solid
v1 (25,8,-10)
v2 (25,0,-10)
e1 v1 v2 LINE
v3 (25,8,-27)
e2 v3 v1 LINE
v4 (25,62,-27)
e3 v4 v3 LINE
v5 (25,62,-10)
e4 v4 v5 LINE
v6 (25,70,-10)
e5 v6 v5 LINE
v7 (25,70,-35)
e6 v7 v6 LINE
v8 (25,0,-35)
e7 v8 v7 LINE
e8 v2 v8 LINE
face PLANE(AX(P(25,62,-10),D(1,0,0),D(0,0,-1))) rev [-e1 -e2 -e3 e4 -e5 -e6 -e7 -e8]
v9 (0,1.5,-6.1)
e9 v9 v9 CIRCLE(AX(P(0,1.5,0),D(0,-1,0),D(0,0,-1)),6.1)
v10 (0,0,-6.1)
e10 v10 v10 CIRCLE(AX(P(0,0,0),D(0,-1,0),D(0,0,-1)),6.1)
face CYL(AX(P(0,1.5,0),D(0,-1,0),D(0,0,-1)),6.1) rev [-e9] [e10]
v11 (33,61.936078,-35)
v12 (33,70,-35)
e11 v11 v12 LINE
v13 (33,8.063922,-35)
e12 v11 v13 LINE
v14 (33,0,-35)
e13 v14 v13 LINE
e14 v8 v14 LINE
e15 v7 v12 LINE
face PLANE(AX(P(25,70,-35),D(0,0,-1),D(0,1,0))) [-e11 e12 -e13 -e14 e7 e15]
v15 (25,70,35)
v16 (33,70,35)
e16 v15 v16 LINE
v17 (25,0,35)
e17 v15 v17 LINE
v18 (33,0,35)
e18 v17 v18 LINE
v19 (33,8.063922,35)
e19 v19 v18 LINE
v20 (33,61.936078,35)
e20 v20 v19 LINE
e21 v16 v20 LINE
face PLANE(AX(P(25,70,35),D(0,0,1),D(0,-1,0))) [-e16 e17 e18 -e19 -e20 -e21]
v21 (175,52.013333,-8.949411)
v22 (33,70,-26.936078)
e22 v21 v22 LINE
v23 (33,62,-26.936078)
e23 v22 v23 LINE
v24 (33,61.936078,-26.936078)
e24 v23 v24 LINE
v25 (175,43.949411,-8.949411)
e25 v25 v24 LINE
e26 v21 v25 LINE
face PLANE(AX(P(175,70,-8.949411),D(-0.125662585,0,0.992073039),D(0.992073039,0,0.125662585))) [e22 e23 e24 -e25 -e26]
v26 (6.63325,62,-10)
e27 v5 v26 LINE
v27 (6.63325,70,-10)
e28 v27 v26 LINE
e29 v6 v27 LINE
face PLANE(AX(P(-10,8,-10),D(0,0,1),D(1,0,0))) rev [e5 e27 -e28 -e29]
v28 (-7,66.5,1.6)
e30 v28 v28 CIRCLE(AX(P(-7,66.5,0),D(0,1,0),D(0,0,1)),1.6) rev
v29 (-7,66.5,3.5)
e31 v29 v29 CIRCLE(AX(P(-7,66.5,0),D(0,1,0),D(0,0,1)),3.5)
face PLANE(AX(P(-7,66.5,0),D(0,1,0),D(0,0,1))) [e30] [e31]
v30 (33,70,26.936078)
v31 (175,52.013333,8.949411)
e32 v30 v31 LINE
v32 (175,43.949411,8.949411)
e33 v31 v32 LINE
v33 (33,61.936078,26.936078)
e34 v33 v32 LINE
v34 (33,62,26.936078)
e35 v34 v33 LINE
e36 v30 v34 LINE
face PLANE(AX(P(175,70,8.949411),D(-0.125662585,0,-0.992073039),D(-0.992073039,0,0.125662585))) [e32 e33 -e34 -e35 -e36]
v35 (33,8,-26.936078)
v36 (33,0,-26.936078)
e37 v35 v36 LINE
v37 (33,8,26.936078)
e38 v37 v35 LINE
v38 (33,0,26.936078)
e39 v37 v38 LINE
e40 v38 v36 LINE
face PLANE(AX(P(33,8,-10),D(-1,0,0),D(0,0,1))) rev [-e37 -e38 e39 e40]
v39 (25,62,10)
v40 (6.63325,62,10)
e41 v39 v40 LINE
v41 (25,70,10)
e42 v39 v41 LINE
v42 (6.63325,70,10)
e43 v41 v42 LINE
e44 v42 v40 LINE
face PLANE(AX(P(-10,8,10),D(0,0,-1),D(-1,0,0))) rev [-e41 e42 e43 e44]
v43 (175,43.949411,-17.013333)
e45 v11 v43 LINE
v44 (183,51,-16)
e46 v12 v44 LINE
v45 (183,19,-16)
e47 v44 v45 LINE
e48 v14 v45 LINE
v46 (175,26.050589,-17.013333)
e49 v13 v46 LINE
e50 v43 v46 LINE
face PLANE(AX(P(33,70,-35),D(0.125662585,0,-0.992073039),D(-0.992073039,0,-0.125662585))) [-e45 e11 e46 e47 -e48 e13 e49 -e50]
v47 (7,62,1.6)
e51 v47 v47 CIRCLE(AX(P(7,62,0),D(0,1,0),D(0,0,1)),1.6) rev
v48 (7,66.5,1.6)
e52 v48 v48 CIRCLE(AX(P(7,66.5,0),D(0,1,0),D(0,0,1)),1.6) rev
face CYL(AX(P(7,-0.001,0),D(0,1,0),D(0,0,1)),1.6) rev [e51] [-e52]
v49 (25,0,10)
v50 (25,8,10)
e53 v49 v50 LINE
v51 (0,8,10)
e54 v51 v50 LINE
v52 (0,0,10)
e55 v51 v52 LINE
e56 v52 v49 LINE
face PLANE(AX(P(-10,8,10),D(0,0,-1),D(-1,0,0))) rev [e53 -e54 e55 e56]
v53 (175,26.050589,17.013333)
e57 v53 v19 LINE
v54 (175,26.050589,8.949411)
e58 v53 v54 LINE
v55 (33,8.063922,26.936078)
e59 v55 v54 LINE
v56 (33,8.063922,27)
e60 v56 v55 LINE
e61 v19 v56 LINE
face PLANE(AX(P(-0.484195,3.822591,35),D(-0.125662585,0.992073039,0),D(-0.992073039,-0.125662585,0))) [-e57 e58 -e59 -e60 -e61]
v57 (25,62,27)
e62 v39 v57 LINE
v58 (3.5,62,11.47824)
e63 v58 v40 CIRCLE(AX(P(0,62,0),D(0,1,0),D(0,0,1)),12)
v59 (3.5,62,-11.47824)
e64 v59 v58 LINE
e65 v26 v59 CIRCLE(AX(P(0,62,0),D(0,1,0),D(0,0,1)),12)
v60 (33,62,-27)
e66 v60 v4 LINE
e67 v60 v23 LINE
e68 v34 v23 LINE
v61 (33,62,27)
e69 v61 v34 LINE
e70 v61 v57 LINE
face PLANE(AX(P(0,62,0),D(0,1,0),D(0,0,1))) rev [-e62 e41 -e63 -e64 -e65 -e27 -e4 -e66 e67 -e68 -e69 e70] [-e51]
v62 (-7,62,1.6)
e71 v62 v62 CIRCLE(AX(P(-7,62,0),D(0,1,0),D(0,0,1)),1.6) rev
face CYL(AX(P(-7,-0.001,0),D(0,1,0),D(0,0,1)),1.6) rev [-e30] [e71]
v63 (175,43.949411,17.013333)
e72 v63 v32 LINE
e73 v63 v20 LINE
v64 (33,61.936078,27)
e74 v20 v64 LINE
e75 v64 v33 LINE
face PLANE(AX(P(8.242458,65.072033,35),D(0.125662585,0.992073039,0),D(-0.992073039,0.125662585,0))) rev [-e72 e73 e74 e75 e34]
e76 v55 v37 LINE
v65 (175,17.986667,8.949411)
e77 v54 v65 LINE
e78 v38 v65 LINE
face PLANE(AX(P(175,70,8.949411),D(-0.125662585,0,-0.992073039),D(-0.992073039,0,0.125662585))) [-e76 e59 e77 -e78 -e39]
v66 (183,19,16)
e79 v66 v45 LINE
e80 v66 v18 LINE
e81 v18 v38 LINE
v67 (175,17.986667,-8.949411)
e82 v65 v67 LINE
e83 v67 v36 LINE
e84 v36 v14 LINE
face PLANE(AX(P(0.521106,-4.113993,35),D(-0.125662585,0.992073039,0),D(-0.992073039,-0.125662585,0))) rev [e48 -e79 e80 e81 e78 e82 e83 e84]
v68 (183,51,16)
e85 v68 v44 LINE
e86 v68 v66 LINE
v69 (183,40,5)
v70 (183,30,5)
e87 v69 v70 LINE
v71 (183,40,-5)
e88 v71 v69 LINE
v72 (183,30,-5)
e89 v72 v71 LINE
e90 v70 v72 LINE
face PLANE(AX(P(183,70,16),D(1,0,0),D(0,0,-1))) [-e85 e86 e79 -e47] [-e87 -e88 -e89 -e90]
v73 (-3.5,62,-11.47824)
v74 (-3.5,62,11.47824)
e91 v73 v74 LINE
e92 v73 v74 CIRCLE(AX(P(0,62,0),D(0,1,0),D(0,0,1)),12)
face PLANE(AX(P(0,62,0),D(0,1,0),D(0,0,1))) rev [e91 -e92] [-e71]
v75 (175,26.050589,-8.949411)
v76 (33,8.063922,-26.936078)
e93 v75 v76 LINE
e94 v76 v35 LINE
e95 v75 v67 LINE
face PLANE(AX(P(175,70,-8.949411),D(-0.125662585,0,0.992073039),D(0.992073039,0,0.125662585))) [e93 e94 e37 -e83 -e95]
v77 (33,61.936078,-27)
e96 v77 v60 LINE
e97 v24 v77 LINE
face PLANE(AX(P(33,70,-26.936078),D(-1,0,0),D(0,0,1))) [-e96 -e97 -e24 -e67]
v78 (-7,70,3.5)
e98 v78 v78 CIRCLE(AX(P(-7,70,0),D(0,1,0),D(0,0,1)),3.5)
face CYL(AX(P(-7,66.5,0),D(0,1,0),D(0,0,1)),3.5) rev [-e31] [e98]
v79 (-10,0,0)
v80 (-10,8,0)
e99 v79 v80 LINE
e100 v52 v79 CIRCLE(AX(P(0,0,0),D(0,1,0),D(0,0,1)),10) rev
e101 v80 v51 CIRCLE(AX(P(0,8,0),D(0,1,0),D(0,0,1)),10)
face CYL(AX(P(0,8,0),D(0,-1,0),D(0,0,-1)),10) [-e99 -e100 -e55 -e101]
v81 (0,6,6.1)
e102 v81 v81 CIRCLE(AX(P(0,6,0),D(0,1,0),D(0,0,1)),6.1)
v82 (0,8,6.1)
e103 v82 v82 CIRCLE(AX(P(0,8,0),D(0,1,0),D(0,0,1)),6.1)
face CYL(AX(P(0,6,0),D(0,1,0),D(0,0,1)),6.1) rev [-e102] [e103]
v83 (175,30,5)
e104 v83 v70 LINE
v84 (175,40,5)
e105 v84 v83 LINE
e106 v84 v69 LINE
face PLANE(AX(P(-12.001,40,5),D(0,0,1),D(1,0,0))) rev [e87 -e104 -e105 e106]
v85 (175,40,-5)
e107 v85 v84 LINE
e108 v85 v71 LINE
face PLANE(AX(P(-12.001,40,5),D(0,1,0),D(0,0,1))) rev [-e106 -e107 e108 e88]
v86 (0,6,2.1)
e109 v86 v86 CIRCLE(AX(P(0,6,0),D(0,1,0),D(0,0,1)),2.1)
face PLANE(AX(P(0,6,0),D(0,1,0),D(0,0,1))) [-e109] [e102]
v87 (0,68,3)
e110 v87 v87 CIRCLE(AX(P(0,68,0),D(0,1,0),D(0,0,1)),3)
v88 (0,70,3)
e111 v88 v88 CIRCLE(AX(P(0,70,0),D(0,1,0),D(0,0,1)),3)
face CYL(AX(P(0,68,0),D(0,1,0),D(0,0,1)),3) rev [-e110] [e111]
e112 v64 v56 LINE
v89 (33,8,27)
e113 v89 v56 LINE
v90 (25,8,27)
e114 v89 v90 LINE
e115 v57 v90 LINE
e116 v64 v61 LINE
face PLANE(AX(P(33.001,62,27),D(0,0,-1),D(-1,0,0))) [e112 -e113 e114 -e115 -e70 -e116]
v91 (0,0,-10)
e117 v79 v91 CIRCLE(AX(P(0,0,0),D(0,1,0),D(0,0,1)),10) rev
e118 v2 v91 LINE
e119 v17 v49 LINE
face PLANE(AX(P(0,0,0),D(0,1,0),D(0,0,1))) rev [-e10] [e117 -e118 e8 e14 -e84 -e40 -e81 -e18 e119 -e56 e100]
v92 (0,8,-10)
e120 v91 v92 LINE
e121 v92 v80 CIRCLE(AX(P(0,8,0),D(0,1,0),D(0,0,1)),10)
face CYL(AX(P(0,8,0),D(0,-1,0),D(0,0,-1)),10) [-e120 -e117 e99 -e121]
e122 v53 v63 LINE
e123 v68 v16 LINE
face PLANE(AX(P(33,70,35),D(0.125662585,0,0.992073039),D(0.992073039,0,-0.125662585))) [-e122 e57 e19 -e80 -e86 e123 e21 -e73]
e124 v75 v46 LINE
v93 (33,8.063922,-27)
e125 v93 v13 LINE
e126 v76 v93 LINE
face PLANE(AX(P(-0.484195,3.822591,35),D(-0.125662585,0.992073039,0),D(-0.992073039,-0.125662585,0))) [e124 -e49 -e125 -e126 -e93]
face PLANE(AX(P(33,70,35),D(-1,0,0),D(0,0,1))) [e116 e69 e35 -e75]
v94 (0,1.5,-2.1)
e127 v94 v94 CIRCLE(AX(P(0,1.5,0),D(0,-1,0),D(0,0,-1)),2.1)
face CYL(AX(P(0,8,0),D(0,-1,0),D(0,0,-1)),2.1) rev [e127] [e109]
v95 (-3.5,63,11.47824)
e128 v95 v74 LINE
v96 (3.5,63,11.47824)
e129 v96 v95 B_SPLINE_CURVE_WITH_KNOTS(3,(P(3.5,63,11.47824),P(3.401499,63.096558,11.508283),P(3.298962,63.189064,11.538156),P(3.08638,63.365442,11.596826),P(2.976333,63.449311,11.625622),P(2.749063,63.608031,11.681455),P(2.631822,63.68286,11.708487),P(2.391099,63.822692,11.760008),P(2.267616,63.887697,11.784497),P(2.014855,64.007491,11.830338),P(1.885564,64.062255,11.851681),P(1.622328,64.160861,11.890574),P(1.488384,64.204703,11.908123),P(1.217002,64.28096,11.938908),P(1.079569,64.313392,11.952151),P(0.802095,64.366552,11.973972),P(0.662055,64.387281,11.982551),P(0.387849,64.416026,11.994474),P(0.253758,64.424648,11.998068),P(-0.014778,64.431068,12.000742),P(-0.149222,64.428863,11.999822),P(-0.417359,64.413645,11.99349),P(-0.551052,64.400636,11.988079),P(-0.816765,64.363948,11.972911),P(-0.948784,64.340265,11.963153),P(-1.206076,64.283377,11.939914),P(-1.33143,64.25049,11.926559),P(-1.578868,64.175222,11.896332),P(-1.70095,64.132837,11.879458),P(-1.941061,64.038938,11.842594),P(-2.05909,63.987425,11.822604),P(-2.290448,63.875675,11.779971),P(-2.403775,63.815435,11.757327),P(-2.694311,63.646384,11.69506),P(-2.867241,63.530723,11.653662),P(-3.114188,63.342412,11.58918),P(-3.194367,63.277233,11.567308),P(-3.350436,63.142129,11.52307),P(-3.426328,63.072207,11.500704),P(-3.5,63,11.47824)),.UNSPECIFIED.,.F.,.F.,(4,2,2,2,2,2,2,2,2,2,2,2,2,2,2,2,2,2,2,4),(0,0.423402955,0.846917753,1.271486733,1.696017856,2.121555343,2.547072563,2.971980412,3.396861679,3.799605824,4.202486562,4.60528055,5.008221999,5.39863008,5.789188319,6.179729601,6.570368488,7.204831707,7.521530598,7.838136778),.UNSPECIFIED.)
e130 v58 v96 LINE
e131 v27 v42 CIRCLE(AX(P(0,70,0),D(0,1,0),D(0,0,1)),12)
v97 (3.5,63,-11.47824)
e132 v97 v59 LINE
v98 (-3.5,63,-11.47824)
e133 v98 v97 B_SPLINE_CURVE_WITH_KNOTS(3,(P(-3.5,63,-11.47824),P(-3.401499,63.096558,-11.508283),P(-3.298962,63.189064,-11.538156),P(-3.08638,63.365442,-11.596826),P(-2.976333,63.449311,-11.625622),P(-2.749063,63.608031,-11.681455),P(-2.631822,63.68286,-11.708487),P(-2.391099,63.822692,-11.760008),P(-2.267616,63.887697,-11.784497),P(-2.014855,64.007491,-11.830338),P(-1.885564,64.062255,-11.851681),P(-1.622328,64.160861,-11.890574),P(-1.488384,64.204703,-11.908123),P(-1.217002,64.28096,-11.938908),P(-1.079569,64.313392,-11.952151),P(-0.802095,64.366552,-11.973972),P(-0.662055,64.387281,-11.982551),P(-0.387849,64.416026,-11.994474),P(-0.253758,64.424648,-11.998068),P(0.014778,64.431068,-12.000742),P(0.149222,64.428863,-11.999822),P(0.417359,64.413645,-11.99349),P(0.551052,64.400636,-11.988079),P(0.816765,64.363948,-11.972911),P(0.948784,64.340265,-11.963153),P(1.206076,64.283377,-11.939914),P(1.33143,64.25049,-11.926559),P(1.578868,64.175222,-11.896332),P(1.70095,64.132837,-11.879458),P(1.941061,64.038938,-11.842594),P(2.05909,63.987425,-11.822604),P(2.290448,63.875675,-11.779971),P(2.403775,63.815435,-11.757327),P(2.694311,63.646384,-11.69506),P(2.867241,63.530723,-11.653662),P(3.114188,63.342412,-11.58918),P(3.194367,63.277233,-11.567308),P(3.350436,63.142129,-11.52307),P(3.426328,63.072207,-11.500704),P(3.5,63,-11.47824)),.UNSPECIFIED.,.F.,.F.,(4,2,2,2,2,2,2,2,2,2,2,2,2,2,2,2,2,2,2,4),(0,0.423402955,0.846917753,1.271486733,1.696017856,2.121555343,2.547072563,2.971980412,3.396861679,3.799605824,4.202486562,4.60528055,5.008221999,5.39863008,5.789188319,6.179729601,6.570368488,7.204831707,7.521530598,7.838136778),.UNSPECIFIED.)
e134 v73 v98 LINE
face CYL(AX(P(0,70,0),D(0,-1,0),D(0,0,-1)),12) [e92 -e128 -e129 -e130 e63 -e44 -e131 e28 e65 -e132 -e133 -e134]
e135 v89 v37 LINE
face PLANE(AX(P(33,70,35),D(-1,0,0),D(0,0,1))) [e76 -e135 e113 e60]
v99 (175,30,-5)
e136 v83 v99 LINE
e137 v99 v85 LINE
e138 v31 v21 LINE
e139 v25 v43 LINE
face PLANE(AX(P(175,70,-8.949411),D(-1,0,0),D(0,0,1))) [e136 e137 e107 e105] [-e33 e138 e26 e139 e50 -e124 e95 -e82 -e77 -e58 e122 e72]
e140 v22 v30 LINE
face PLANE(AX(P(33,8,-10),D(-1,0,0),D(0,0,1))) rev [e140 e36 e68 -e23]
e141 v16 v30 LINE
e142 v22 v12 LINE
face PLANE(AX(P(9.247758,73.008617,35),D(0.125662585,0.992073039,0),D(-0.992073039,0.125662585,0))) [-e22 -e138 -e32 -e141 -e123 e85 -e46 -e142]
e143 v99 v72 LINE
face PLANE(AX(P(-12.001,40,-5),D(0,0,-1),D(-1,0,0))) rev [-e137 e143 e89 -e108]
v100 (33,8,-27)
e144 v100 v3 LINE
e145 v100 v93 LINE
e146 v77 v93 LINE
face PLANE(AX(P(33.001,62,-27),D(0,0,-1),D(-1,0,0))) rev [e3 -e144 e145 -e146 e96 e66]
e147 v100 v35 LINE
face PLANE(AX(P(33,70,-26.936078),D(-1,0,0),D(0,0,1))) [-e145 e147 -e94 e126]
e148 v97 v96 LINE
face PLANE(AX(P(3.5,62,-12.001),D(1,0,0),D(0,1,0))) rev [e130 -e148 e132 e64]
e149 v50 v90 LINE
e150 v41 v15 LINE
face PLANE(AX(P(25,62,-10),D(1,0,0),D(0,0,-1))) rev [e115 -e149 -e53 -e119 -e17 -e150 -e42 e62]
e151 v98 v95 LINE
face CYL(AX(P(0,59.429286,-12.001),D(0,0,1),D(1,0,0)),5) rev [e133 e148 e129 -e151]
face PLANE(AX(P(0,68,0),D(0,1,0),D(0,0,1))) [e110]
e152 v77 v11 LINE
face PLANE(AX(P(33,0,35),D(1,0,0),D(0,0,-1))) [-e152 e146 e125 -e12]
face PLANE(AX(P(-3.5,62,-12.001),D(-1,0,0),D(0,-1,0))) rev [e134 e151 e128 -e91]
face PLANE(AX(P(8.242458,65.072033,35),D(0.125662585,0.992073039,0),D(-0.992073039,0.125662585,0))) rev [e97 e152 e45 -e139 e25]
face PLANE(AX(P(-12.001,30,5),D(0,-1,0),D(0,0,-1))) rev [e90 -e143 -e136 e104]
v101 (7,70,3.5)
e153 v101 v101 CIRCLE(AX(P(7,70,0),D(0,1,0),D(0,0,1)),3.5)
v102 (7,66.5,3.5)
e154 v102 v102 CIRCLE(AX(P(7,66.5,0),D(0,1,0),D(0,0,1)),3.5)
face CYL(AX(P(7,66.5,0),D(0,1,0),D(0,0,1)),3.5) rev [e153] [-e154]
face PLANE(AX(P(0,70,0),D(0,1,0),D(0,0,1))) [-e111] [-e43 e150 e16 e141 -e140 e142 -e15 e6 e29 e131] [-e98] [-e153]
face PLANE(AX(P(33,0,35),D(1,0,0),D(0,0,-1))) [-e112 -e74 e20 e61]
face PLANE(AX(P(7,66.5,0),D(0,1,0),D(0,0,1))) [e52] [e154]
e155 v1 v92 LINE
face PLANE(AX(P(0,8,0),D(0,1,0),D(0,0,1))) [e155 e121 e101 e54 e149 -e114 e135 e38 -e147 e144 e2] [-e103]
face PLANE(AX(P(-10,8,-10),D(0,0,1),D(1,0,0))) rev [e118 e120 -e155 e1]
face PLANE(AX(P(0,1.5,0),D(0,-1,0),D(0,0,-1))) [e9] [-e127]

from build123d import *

# Parameters (mm, degrees)
SZKIC1_W                        = 43
SZKIC1_H                        = 20
SZKIC1_R                        = 2.1
DODANIE_WYCI_GNI_CIE1_DEPTH     = 8
SZKIC2_R                        = 6.1
WYTNIJ_WYCI_GNI_CIE1_DEPTH      = 2
WYTNIJ_WYCI_GNI_CIE2_START      = -1.5
SZKIC3_R                        = 6.1
WYTNIJ_WYCI_GNI_CIE2_DEPTH      = 1.5
SZKIC4_W                        = 8
SZKIC4_H                        = 20
DODANIE_WYCI_GNI_CIE2_DEPTH     = 54
ZAOKR_GLENIE1_R                 = 10
DODANIE_WYCI_GNI_CIE3_DEPTH     = 8
WYTNIJ_WYCI_GNI_CIE3_REACH      = 80.313
SZKIC6_R                        = 1.6
SZKIC7_R                        = 3.5
WYTNIJ_WYCI_GNI_CIE4_DEPTH      = 3.5
WYTNIJ_WYCI_GNI_CIE5_REACH      = 83.025
WYTNIJ_WYCI_GNI_CIE5_END_RADIUS = 12
SZKIC10_R                       = 3
WYTNIJ_WYCI_GNI_CIE6_DEPTH      = 2
SZKIC13_W                       = 25
SZKIC13_H                       = 70
DODANIE_WYCI_GNI_CIE4_DEPTH     = 8
WYTNIJ_WYCI_GNI_CIE7_REACH      = 88.568
SZKIC14_W                       = 54
SZKIC14_H                       = 54
DODANIE_WYCI_GNI_CIE5_DEPTH     = 70
WYTNIJ_WYCI_GNI_CIE9_DEPTH      = 209.060087508
WYTNIJ_WYCI_GNI_CIE10_REACH     = 212.119
SZKIC20_W                       = 10
SZKIC20_H                       = 10


with BuildPart() as part:
    # Szkic1 → Dodanie-wyciągnięcie1 (new body)
    with BuildSketch(Plane(origin=(0, 0, 0), x_dir=(1, 0, 0), z_dir=(0, 1, 0))):
        with Locations((11.5, 0)):
            Rectangle(SZKIC1_W, SZKIC1_H)
        with Locations(Location((0, 0, 0), (0, 0, 270))):
            Circle(SZKIC1_R, mode=Mode.SUBTRACT)
    extrude(amount=DODANIE_WYCI_GNI_CIE1_DEPTH)

    # Szkic2 → Wytnij-wyciągnięcie1 (cut)
    with BuildSketch(Plane(origin=(0, 8, 0), x_dir=(1, 0, 0), z_dir=(0, 1, 0))):
        with Locations(Location((0, 0, 0), (0, 0, 270))):
            Circle(SZKIC2_R)
    extrude(amount=-WYTNIJ_WYCI_GNI_CIE1_DEPTH, mode=Mode.SUBTRACT)

    # Szkic3 → Wytnij-wyciągnięcie2 (cut)
    with BuildSketch(Plane.XZ.offset(WYTNIJ_WYCI_GNI_CIE2_START)):
        with Locations(Location((0, 0, 0), (0, 0, 90))):
            Circle(SZKIC3_R)
    extrude(amount=WYTNIJ_WYCI_GNI_CIE2_DEPTH, mode=Mode.SUBTRACT)

    # Szkic4 → Dodanie-wyciągnięcie2 (add)
    with BuildSketch(Plane(origin=(0, 8, 0), x_dir=(1, 0, 0), z_dir=(0, 1, 0))):
        with Locations((29, 0)):
            Rectangle(SZKIC4_W, SZKIC4_H)
    extrude(amount=DODANIE_WYCI_GNI_CIE2_DEPTH)

    # Zaokrąglenie1
    zaokr_glenie1_edges = [part.edges().sort_by_distance(p)[0] for p in [
        (-10, 4, -10),
        (-10, 4, 10),
    ]]
    fillet(zaokr_glenie1_edges, radius=ZAOKR_GLENIE1_R - 0.0001)  # a hair under: the kernel refuses the full size

    # Szkic5 → Dodanie-wyciągnięcie3 (add)
    with BuildSketch(Plane(origin=(0, 62, 0), x_dir=(1, 0, 0), z_dir=(0, 1, 0))):
        with BuildLine():
            Line((33, -10), (33, 10))
            Line((33, 10), (6.633249581, 10))
            ThreePointArc((6.633249581, 10), (-12, 0), (6.633249581, -10))
            Line((6.633249581, -10), (33, -10))
        make_face()
    extrude(amount=DODANIE_WYCI_GNI_CIE3_DEPTH)

    # Szkic6 → Wytnij-wyciągnięcie3 (cut, up to next)
    with BuildSketch(Plane(origin=(0, 70, 0), x_dir=(1, 0, 0), z_dir=(0, 1, 0)), mode=Mode.PRIVATE) as wytnij_wyci_gni_cie3_sk1:
        with Locations(Location((-7, 0, 0), (0, 0, 270))):
            Circle(SZKIC6_R)
    wytnij_wyci_gni_cie3_tool1 = extrude(wytnij_wyci_gni_cie3_sk1.sketch, amount=-WYTNIJ_WYCI_GNI_CIE3_REACH, mode=Mode.PRIVATE) & part.part
    # Szkic6 → Wytnij-wyciągnięcie3 (cut, up to next)
    with BuildSketch(Plane(origin=(0, 70, 0), x_dir=(1, 0, 0), z_dir=(0, 1, 0)), mode=Mode.PRIVATE) as wytnij_wyci_gni_cie3_sk2:
        with Locations(Location((7, 0, 0), (0, 0, 270))):
            Circle(SZKIC6_R)
    wytnij_wyci_gni_cie3_tool2 = extrude(wytnij_wyci_gni_cie3_sk2.sketch, amount=-WYTNIJ_WYCI_GNI_CIE3_REACH, mode=Mode.PRIVATE) & part.part
    add(wytnij_wyci_gni_cie3_tool1.solids().sort_by_distance((-7, 70, 0))[0], mode=Mode.SUBTRACT)
    add(wytnij_wyci_gni_cie3_tool2.solids().sort_by_distance((7, 70, 0))[0], mode=Mode.SUBTRACT)

    # Szkic7 → Wytnij-wyciągnięcie4 (cut)
    with BuildSketch(Plane(origin=(0, 70, 0), x_dir=(1, 0, 0), z_dir=(0, 1, 0))):
        with Locations(Location((7, 0, 0), (0, 0, 270))):
            Circle(SZKIC7_R)
        with Locations(Location((-7, 0, 0), (0, 0, 270))):
            Circle(SZKIC7_R)
    extrude(amount=-WYTNIJ_WYCI_GNI_CIE4_DEPTH, mode=Mode.SUBTRACT)

    # Wytnij-wyciągnięcie5: up to this cylinder (the profile starts inside it)
    wytnij_wyci_gni_cie5_end = Plane(origin=(0, 63.035303, 0), z_dir=(0, -1, 0)) * Cylinder(WYTNIJ_WYCI_GNI_CIE5_END_RADIUS, 191.05, mode=Mode.PRIVATE)
    # Szkic9 → Wytnij-wyciągnięcie5 (cut, up to the surface)
    with BuildSketch(Plane.XY.offset(12), mode=Mode.PRIVATE) as wytnij_wyci_gni_cie5_sk1:
        with BuildLine():
            Line((-3.5, 62), (3.5, 62))
            Line((3.5, 62), (3.5, 63))
            ThreePointArc((3.5, 63), (0, 64.429285786), (-3.5, 63))
            Line((-3.5, 63), (-3.5, 62))
        make_face()
    wytnij_wyci_gni_cie5_tool1 = extrude(wytnij_wyci_gni_cie5_sk1.sketch, amount=-WYTNIJ_WYCI_GNI_CIE5_REACH, mode=Mode.PRIVATE) & wytnij_wyci_gni_cie5_end
    add(wytnij_wyci_gni_cie5_tool1.solids().sort_by_distance((0, 63.035303, 12))[0], mode=Mode.SUBTRACT)

    # Szkic10 → Wytnij-wyciągnięcie6 (cut)
    with BuildSketch(Plane(origin=(0, 70, 0), x_dir=(1, 0, 0), z_dir=(0, 1, 0))):
        with Locations(Location((0, 0, 0), (0, 0, 270))):
            Circle(SZKIC10_R)
    extrude(amount=-WYTNIJ_WYCI_GNI_CIE6_DEPTH, mode=Mode.SUBTRACT)

    # Szkic13 → Dodanie-wyciągnięcie4 (add)
    with BuildSketch(Plane(origin=(33, 0, 0), x_dir=(0, 0, -1), z_dir=(1, 0, 0))):
        with Locations((22.5, 35)):
            Rectangle(SZKIC13_W, SZKIC13_H)
        with Locations((-22.5, 35)):
            Rectangle(SZKIC13_W, SZKIC13_H)
    extrude(amount=-DODANIE_WYCI_GNI_CIE4_DEPTH)

    # Szkic14 → Wytnij-wyciągnięcie7 (cut, up to next)
    with BuildSketch(Plane.ZY.offset(-25), mode=Mode.PRIVATE) as wytnij_wyci_gni_cie7_sk1:
        with Locations((0, 35)):
            Rectangle(SZKIC14_W, SZKIC14_H)
    wytnij_wyci_gni_cie7_tool1 = extrude(wytnij_wyci_gni_cie7_sk1.sketch, amount=-WYTNIJ_WYCI_GNI_CIE7_REACH, mode=Mode.PRIVATE) & part.part
    add(wytnij_wyci_gni_cie7_tool1.solids().sort_by_distance((25, 35, 0))[0], mode=Mode.SUBTRACT)

    # Szkic17 → Dodanie-wyciągnięcie5 (add, through all)
    with BuildSketch(Plane.XZ):
        Polygon((33, 35), (183, 16), (183, -16), (33, -35), (33, -26.936077602), (175, -8.949410935), (175, 8.949410935), (33, 26.936077602), align=None)
    extrude(amount=-DODANIE_WYCI_GNI_CIE5_DEPTH)

    # Szkic18 → Wytnij-wyciągnięcie9 (cut, through all)
    with BuildSketch(Plane(origin=(0, 0, -35), x_dir=(-1, 0, 0), z_dir=(0, 0, -1))):
        Polygon((-33, 70), (-183, 70), (-183, 51), align=None)
        Polygon((-183, 0), (-183, 19), (-33, 0), align=None)
        Polygon((-33, 8.063922398), (-33, 61.936077602), (-175, 43.949410935), (-175, 26.050589065), align=None)
    extrude(amount=-WYTNIJ_WYCI_GNI_CIE9_DEPTH, mode=Mode.SUBTRACT)

    # Szkic20 → Wytnij-wyciągnięcie10 (cut, up to next)
    with BuildSketch(Plane(origin=(183, 0, 0), x_dir=(0, 0, -1), z_dir=(1, 0, 0)), mode=Mode.PRIVATE) as wytnij_wyci_gni_cie10_sk1:
        with Locations((0, 35)):
            Rectangle(SZKIC20_W, SZKIC20_H)
    wytnij_wyci_gni_cie10_tool1 = extrude(wytnij_wyci_gni_cie10_sk1.sketch, amount=-WYTNIJ_WYCI_GNI_CIE10_REACH, mode=Mode.PRIVATE) & part.part
    add(wytnij_wyci_gni_cie10_tool1.solids().sort_by_distance((183, 35, 0))[0], mode=Mode.SUBTRACT)


solid = part.part
